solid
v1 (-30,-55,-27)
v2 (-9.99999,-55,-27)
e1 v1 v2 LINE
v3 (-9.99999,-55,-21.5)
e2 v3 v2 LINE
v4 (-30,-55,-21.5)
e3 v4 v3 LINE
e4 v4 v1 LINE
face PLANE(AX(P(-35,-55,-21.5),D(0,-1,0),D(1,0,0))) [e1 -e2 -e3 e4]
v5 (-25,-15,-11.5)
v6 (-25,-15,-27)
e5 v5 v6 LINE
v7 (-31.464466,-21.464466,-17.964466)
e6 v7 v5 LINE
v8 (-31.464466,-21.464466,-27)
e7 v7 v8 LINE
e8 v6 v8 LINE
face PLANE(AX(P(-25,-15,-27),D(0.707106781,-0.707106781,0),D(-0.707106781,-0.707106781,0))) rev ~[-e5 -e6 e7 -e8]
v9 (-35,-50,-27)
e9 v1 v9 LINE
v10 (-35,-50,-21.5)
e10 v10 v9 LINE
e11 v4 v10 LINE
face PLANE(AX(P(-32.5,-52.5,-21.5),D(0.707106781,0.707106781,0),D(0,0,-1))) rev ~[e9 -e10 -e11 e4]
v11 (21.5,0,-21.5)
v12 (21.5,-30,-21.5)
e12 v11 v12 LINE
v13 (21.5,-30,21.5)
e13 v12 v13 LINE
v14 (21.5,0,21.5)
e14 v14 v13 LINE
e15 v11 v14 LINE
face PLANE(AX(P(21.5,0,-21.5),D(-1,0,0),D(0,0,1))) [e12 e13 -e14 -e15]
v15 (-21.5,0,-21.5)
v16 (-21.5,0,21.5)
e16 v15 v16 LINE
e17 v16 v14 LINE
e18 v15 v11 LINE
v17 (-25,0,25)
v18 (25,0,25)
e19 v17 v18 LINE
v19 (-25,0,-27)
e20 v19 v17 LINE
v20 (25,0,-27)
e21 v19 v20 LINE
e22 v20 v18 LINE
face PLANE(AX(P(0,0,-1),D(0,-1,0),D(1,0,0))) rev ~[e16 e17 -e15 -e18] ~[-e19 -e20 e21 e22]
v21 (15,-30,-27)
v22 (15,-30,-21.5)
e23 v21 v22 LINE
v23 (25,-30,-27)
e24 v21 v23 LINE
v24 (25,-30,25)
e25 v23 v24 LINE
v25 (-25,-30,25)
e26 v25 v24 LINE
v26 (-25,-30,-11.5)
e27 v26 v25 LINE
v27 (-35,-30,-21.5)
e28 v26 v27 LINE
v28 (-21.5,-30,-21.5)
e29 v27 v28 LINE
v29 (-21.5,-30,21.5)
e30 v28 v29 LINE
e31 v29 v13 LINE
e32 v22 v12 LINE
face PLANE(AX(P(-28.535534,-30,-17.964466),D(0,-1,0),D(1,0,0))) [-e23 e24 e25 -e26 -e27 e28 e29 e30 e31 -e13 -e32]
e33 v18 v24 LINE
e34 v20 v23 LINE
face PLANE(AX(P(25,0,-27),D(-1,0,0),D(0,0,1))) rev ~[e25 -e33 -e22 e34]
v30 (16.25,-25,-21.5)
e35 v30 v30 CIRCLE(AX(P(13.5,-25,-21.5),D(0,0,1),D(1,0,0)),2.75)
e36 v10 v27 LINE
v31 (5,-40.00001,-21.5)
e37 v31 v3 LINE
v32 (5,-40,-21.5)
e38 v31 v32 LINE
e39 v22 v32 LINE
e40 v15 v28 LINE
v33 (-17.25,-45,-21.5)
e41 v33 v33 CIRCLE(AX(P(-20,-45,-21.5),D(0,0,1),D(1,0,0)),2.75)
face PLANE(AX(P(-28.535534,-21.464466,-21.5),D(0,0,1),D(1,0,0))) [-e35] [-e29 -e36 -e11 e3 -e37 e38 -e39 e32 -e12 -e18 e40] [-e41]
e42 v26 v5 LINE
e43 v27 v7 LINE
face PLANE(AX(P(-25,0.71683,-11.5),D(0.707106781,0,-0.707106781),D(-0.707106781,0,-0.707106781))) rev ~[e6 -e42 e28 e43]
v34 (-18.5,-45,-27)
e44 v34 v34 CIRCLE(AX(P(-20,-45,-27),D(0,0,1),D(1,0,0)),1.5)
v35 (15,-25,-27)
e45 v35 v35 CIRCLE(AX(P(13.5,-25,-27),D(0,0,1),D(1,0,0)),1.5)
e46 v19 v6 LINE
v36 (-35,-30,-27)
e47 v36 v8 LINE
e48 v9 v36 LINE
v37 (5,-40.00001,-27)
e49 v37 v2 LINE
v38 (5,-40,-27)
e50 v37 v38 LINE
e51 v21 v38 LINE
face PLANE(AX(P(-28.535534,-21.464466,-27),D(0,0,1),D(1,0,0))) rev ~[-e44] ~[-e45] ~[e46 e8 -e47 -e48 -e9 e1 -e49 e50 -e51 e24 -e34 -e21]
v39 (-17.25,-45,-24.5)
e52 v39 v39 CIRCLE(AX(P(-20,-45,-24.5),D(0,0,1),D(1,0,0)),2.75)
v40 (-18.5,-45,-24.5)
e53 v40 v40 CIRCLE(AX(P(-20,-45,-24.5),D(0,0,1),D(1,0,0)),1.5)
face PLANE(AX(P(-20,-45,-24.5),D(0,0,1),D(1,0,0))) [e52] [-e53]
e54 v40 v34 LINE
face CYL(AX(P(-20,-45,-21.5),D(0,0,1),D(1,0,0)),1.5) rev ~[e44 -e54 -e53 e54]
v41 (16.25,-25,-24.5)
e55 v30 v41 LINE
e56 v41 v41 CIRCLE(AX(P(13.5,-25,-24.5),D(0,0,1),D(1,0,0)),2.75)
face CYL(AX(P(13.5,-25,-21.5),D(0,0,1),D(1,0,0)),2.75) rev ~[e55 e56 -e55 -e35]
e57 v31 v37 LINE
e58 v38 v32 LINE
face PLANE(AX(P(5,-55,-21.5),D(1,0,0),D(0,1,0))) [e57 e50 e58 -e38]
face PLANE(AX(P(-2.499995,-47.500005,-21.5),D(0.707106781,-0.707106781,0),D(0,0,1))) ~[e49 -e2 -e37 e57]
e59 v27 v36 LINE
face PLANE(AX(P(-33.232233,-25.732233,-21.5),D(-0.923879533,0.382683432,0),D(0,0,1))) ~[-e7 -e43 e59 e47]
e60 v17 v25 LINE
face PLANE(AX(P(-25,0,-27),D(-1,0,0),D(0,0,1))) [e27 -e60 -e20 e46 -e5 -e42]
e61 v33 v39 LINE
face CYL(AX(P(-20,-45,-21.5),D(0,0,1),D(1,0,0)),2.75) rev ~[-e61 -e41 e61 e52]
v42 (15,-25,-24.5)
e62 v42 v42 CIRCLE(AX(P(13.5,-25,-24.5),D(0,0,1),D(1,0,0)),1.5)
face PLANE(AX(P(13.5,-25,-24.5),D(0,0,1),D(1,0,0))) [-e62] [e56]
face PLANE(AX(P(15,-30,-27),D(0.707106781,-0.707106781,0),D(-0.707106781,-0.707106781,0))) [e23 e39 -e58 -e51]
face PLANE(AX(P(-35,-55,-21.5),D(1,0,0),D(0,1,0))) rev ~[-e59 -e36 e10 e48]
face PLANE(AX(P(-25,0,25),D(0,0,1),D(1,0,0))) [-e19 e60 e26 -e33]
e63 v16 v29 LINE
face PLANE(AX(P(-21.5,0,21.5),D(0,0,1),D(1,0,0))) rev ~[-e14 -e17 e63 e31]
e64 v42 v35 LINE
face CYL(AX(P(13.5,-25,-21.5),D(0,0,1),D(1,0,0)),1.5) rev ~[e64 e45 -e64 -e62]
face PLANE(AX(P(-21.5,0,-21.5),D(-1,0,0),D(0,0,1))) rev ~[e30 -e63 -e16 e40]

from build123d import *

# Parameters (mm, degrees)
F0_W          = 50
F0_H          = 52
F2_DEPTH      = 30
F1_W          = 43
F1_H          = 43
F3_DEPTH      = 30
F5_W          = 40
F5_H          = 30
F6_DEPTH      = 5.5
F4_W          = 10
F4_H          = 5.5
F7_DEPTH      = 20
F8_R          = 1.5
F9_DEPTH      = 25
F10_R         = 2.75
F11_DEPTH     = 3
F12_T1_DEPTH  = 5.5
F12_T6_DEPTH  = 5.5
F12_T11_DEPTH = 5
F12_T17_DEPTH = 31.2168298797
F12_T22_DEPTH = 30.7168298797
F13_SIZE      = 14.99999
F14_SIZE      = 5
F15_SIZE      = 5


# Not quite as in the source:
# - a fillet or chamfer that OpenCascade refuses, or shapes differently, is made with other operations: its cross-section is extruded or revolved along the edge and cut away or added
# - a fillet or chamfer is up to 0.001 mm smaller than in the source, because OpenCascade refuses the exact size


with BuildPart() as f2:
    # F0 (on Front) → F2 (new body)
    with BuildSketch(Plane.XZ):
        with Locations((0, -1)):
            Rectangle(F0_W, F0_H)
    extrude(amount=F2_DEPTH)

    # F1 (on face) → F3 (cut)
    with BuildSketch(Plane.XZ):
        Rectangle(F1_W, F1_H)
    extrude(amount=F3_DEPTH, mode=Mode.SUBTRACT)

    # F5 (on face) → F6 (join)
    with BuildSketch(Plane.XY.offset(-21.5)):
        with Locations((-15, -40)):
            Rectangle(F5_W, F5_H)
    extrude(amount=-F6_DEPTH)

    # F4 (on face) → F7 (join)
    with BuildSketch(Plane.XZ.offset(30)):
        with Locations((-20, -24.25)):
            Rectangle(F4_W, F4_H)
    extrude(amount=F7_DEPTH)

    # F8 (on face) → F9 (cut)
    with BuildSketch(Plane.XY.offset(-21.5)):
        with Locations((-20, -45)):
            Circle(F8_R)
        with Locations((13.5, -25)):
            Circle(F8_R)
    extrude(amount=-F9_DEPTH, mode=Mode.SUBTRACT)

    # F10 (on face) → F11 (cut)
    with BuildSketch(Plane.XY.offset(-21.5)):
        with Locations((-20, -45)):
            Circle(F10_R)
        with Locations((13.5, -25)):
            Circle(F10_R)
    extrude(amount=-F11_DEPTH, mode=Mode.SUBTRACT)

    # F12: chamfer of 10 on 3 edges, made by hand

    # F12_s2 → F12_t1 (join)
    with BuildSketch(Plane.XY.offset(-27)):
        Polygon((15, -30), (5, -40), (5, -30), align=None)
    extrude(amount=F12_T1_DEPTH)


with BuildPart() as f12_tool4:
    # F12_s5 → F12_t6 (new body)
    with BuildSketch(Plane.XY.offset(-27)):
        Polygon((-25, -15), (-35, -25), (-25, -25), align=None)
    extrude(amount=F12_T6_DEPTH)

    split(bisect_by=Plane.YZ.offset(-35), keep=Keep.TOP)


with BuildPart() as f2_1:
    add(f2.part)

    # F12_t3: union F12_tool4
    add(f12_tool4.part)


with BuildPart() as f12_tool9:
    # F12_s10 → F12_t11 (new body)
    with BuildSketch(Plane.XZ.offset(25)):
        Polygon((-25, -11.5), (-35, -21.5), (-25, -21.5), align=None)
    extrude(amount=F12_T11_DEPTH)

    split(bisect_by=Plane.YZ.offset(-35), keep=Keep.TOP)


with BuildPart() as f2_2:
    add(f2_1.part)

    # F12_t8: union F12_tool9
    add(f12_tool9.part)


with BuildPart() as f12_tool15:
    # F12_s16 → F12_t17 (new body)
    with BuildSketch(Plane.XY.offset(-27)):
        Polygon((-25, -15), (-35, -25), (-25, -25), align=None)
    extrude(amount=F12_T17_DEPTH)

    split(bisect_by=Plane.XY.offset(-21.5), keep=Keep.TOP)

    split(bisect_by=Plane.YZ.offset(-35), keep=Keep.TOP)


with BuildPart() as f12_tool20:
    # F12_s21 → F12_t22 (new body)
    with BuildSketch(Plane.XZ.offset(-0.7168298797)):
        Polygon((-25, -11.5), (-35, -21.5), (-25, -21.5), align=None)
    extrude(amount=F12_T22_DEPTH)

    split(bisect_by=Plane.XZ, keep=Keep.TOP)

    split(bisect_by=Plane.XZ.offset(25), keep=Keep.BOTTOM)

    split(bisect_by=Plane.YZ.offset(-35), keep=Keep.TOP)


with BuildPart() as f12_tool15_1:
    add(f12_tool15.part)

    # F12_t26: intersect F12_tool20
    add(f12_tool20.part, mode=Mode.INTERSECT)


with BuildPart() as f2_3:
    add(f2_2.part)

    # F12_t13: union F12_tool15
    add(f12_tool15_1.part)

    # F13 (size 15 in the source; OpenCascade refuses exactly that, so slightly less here)
    f13_edges = [f2_3.edges().sort_by_distance(p)[0] for p in [
        (5, -55, -24.25),
    ]]
    chamfer(f13_edges, length=F13_SIZE)

    # F14
    f14_edges = [f2_3.edges().sort_by_distance(p)[0] for p in [
        (-35, -55, -24.25),
    ]]
    chamfer(f14_edges, length=F14_SIZE)

    # F15
    f15_edges = [f2_3.edges().sort_by_distance(p)[0] for p in [
        (-35, -25, -24.25),
    ]]
    chamfer(f15_edges, length=F15_SIZE)


solid = f2_3.part
